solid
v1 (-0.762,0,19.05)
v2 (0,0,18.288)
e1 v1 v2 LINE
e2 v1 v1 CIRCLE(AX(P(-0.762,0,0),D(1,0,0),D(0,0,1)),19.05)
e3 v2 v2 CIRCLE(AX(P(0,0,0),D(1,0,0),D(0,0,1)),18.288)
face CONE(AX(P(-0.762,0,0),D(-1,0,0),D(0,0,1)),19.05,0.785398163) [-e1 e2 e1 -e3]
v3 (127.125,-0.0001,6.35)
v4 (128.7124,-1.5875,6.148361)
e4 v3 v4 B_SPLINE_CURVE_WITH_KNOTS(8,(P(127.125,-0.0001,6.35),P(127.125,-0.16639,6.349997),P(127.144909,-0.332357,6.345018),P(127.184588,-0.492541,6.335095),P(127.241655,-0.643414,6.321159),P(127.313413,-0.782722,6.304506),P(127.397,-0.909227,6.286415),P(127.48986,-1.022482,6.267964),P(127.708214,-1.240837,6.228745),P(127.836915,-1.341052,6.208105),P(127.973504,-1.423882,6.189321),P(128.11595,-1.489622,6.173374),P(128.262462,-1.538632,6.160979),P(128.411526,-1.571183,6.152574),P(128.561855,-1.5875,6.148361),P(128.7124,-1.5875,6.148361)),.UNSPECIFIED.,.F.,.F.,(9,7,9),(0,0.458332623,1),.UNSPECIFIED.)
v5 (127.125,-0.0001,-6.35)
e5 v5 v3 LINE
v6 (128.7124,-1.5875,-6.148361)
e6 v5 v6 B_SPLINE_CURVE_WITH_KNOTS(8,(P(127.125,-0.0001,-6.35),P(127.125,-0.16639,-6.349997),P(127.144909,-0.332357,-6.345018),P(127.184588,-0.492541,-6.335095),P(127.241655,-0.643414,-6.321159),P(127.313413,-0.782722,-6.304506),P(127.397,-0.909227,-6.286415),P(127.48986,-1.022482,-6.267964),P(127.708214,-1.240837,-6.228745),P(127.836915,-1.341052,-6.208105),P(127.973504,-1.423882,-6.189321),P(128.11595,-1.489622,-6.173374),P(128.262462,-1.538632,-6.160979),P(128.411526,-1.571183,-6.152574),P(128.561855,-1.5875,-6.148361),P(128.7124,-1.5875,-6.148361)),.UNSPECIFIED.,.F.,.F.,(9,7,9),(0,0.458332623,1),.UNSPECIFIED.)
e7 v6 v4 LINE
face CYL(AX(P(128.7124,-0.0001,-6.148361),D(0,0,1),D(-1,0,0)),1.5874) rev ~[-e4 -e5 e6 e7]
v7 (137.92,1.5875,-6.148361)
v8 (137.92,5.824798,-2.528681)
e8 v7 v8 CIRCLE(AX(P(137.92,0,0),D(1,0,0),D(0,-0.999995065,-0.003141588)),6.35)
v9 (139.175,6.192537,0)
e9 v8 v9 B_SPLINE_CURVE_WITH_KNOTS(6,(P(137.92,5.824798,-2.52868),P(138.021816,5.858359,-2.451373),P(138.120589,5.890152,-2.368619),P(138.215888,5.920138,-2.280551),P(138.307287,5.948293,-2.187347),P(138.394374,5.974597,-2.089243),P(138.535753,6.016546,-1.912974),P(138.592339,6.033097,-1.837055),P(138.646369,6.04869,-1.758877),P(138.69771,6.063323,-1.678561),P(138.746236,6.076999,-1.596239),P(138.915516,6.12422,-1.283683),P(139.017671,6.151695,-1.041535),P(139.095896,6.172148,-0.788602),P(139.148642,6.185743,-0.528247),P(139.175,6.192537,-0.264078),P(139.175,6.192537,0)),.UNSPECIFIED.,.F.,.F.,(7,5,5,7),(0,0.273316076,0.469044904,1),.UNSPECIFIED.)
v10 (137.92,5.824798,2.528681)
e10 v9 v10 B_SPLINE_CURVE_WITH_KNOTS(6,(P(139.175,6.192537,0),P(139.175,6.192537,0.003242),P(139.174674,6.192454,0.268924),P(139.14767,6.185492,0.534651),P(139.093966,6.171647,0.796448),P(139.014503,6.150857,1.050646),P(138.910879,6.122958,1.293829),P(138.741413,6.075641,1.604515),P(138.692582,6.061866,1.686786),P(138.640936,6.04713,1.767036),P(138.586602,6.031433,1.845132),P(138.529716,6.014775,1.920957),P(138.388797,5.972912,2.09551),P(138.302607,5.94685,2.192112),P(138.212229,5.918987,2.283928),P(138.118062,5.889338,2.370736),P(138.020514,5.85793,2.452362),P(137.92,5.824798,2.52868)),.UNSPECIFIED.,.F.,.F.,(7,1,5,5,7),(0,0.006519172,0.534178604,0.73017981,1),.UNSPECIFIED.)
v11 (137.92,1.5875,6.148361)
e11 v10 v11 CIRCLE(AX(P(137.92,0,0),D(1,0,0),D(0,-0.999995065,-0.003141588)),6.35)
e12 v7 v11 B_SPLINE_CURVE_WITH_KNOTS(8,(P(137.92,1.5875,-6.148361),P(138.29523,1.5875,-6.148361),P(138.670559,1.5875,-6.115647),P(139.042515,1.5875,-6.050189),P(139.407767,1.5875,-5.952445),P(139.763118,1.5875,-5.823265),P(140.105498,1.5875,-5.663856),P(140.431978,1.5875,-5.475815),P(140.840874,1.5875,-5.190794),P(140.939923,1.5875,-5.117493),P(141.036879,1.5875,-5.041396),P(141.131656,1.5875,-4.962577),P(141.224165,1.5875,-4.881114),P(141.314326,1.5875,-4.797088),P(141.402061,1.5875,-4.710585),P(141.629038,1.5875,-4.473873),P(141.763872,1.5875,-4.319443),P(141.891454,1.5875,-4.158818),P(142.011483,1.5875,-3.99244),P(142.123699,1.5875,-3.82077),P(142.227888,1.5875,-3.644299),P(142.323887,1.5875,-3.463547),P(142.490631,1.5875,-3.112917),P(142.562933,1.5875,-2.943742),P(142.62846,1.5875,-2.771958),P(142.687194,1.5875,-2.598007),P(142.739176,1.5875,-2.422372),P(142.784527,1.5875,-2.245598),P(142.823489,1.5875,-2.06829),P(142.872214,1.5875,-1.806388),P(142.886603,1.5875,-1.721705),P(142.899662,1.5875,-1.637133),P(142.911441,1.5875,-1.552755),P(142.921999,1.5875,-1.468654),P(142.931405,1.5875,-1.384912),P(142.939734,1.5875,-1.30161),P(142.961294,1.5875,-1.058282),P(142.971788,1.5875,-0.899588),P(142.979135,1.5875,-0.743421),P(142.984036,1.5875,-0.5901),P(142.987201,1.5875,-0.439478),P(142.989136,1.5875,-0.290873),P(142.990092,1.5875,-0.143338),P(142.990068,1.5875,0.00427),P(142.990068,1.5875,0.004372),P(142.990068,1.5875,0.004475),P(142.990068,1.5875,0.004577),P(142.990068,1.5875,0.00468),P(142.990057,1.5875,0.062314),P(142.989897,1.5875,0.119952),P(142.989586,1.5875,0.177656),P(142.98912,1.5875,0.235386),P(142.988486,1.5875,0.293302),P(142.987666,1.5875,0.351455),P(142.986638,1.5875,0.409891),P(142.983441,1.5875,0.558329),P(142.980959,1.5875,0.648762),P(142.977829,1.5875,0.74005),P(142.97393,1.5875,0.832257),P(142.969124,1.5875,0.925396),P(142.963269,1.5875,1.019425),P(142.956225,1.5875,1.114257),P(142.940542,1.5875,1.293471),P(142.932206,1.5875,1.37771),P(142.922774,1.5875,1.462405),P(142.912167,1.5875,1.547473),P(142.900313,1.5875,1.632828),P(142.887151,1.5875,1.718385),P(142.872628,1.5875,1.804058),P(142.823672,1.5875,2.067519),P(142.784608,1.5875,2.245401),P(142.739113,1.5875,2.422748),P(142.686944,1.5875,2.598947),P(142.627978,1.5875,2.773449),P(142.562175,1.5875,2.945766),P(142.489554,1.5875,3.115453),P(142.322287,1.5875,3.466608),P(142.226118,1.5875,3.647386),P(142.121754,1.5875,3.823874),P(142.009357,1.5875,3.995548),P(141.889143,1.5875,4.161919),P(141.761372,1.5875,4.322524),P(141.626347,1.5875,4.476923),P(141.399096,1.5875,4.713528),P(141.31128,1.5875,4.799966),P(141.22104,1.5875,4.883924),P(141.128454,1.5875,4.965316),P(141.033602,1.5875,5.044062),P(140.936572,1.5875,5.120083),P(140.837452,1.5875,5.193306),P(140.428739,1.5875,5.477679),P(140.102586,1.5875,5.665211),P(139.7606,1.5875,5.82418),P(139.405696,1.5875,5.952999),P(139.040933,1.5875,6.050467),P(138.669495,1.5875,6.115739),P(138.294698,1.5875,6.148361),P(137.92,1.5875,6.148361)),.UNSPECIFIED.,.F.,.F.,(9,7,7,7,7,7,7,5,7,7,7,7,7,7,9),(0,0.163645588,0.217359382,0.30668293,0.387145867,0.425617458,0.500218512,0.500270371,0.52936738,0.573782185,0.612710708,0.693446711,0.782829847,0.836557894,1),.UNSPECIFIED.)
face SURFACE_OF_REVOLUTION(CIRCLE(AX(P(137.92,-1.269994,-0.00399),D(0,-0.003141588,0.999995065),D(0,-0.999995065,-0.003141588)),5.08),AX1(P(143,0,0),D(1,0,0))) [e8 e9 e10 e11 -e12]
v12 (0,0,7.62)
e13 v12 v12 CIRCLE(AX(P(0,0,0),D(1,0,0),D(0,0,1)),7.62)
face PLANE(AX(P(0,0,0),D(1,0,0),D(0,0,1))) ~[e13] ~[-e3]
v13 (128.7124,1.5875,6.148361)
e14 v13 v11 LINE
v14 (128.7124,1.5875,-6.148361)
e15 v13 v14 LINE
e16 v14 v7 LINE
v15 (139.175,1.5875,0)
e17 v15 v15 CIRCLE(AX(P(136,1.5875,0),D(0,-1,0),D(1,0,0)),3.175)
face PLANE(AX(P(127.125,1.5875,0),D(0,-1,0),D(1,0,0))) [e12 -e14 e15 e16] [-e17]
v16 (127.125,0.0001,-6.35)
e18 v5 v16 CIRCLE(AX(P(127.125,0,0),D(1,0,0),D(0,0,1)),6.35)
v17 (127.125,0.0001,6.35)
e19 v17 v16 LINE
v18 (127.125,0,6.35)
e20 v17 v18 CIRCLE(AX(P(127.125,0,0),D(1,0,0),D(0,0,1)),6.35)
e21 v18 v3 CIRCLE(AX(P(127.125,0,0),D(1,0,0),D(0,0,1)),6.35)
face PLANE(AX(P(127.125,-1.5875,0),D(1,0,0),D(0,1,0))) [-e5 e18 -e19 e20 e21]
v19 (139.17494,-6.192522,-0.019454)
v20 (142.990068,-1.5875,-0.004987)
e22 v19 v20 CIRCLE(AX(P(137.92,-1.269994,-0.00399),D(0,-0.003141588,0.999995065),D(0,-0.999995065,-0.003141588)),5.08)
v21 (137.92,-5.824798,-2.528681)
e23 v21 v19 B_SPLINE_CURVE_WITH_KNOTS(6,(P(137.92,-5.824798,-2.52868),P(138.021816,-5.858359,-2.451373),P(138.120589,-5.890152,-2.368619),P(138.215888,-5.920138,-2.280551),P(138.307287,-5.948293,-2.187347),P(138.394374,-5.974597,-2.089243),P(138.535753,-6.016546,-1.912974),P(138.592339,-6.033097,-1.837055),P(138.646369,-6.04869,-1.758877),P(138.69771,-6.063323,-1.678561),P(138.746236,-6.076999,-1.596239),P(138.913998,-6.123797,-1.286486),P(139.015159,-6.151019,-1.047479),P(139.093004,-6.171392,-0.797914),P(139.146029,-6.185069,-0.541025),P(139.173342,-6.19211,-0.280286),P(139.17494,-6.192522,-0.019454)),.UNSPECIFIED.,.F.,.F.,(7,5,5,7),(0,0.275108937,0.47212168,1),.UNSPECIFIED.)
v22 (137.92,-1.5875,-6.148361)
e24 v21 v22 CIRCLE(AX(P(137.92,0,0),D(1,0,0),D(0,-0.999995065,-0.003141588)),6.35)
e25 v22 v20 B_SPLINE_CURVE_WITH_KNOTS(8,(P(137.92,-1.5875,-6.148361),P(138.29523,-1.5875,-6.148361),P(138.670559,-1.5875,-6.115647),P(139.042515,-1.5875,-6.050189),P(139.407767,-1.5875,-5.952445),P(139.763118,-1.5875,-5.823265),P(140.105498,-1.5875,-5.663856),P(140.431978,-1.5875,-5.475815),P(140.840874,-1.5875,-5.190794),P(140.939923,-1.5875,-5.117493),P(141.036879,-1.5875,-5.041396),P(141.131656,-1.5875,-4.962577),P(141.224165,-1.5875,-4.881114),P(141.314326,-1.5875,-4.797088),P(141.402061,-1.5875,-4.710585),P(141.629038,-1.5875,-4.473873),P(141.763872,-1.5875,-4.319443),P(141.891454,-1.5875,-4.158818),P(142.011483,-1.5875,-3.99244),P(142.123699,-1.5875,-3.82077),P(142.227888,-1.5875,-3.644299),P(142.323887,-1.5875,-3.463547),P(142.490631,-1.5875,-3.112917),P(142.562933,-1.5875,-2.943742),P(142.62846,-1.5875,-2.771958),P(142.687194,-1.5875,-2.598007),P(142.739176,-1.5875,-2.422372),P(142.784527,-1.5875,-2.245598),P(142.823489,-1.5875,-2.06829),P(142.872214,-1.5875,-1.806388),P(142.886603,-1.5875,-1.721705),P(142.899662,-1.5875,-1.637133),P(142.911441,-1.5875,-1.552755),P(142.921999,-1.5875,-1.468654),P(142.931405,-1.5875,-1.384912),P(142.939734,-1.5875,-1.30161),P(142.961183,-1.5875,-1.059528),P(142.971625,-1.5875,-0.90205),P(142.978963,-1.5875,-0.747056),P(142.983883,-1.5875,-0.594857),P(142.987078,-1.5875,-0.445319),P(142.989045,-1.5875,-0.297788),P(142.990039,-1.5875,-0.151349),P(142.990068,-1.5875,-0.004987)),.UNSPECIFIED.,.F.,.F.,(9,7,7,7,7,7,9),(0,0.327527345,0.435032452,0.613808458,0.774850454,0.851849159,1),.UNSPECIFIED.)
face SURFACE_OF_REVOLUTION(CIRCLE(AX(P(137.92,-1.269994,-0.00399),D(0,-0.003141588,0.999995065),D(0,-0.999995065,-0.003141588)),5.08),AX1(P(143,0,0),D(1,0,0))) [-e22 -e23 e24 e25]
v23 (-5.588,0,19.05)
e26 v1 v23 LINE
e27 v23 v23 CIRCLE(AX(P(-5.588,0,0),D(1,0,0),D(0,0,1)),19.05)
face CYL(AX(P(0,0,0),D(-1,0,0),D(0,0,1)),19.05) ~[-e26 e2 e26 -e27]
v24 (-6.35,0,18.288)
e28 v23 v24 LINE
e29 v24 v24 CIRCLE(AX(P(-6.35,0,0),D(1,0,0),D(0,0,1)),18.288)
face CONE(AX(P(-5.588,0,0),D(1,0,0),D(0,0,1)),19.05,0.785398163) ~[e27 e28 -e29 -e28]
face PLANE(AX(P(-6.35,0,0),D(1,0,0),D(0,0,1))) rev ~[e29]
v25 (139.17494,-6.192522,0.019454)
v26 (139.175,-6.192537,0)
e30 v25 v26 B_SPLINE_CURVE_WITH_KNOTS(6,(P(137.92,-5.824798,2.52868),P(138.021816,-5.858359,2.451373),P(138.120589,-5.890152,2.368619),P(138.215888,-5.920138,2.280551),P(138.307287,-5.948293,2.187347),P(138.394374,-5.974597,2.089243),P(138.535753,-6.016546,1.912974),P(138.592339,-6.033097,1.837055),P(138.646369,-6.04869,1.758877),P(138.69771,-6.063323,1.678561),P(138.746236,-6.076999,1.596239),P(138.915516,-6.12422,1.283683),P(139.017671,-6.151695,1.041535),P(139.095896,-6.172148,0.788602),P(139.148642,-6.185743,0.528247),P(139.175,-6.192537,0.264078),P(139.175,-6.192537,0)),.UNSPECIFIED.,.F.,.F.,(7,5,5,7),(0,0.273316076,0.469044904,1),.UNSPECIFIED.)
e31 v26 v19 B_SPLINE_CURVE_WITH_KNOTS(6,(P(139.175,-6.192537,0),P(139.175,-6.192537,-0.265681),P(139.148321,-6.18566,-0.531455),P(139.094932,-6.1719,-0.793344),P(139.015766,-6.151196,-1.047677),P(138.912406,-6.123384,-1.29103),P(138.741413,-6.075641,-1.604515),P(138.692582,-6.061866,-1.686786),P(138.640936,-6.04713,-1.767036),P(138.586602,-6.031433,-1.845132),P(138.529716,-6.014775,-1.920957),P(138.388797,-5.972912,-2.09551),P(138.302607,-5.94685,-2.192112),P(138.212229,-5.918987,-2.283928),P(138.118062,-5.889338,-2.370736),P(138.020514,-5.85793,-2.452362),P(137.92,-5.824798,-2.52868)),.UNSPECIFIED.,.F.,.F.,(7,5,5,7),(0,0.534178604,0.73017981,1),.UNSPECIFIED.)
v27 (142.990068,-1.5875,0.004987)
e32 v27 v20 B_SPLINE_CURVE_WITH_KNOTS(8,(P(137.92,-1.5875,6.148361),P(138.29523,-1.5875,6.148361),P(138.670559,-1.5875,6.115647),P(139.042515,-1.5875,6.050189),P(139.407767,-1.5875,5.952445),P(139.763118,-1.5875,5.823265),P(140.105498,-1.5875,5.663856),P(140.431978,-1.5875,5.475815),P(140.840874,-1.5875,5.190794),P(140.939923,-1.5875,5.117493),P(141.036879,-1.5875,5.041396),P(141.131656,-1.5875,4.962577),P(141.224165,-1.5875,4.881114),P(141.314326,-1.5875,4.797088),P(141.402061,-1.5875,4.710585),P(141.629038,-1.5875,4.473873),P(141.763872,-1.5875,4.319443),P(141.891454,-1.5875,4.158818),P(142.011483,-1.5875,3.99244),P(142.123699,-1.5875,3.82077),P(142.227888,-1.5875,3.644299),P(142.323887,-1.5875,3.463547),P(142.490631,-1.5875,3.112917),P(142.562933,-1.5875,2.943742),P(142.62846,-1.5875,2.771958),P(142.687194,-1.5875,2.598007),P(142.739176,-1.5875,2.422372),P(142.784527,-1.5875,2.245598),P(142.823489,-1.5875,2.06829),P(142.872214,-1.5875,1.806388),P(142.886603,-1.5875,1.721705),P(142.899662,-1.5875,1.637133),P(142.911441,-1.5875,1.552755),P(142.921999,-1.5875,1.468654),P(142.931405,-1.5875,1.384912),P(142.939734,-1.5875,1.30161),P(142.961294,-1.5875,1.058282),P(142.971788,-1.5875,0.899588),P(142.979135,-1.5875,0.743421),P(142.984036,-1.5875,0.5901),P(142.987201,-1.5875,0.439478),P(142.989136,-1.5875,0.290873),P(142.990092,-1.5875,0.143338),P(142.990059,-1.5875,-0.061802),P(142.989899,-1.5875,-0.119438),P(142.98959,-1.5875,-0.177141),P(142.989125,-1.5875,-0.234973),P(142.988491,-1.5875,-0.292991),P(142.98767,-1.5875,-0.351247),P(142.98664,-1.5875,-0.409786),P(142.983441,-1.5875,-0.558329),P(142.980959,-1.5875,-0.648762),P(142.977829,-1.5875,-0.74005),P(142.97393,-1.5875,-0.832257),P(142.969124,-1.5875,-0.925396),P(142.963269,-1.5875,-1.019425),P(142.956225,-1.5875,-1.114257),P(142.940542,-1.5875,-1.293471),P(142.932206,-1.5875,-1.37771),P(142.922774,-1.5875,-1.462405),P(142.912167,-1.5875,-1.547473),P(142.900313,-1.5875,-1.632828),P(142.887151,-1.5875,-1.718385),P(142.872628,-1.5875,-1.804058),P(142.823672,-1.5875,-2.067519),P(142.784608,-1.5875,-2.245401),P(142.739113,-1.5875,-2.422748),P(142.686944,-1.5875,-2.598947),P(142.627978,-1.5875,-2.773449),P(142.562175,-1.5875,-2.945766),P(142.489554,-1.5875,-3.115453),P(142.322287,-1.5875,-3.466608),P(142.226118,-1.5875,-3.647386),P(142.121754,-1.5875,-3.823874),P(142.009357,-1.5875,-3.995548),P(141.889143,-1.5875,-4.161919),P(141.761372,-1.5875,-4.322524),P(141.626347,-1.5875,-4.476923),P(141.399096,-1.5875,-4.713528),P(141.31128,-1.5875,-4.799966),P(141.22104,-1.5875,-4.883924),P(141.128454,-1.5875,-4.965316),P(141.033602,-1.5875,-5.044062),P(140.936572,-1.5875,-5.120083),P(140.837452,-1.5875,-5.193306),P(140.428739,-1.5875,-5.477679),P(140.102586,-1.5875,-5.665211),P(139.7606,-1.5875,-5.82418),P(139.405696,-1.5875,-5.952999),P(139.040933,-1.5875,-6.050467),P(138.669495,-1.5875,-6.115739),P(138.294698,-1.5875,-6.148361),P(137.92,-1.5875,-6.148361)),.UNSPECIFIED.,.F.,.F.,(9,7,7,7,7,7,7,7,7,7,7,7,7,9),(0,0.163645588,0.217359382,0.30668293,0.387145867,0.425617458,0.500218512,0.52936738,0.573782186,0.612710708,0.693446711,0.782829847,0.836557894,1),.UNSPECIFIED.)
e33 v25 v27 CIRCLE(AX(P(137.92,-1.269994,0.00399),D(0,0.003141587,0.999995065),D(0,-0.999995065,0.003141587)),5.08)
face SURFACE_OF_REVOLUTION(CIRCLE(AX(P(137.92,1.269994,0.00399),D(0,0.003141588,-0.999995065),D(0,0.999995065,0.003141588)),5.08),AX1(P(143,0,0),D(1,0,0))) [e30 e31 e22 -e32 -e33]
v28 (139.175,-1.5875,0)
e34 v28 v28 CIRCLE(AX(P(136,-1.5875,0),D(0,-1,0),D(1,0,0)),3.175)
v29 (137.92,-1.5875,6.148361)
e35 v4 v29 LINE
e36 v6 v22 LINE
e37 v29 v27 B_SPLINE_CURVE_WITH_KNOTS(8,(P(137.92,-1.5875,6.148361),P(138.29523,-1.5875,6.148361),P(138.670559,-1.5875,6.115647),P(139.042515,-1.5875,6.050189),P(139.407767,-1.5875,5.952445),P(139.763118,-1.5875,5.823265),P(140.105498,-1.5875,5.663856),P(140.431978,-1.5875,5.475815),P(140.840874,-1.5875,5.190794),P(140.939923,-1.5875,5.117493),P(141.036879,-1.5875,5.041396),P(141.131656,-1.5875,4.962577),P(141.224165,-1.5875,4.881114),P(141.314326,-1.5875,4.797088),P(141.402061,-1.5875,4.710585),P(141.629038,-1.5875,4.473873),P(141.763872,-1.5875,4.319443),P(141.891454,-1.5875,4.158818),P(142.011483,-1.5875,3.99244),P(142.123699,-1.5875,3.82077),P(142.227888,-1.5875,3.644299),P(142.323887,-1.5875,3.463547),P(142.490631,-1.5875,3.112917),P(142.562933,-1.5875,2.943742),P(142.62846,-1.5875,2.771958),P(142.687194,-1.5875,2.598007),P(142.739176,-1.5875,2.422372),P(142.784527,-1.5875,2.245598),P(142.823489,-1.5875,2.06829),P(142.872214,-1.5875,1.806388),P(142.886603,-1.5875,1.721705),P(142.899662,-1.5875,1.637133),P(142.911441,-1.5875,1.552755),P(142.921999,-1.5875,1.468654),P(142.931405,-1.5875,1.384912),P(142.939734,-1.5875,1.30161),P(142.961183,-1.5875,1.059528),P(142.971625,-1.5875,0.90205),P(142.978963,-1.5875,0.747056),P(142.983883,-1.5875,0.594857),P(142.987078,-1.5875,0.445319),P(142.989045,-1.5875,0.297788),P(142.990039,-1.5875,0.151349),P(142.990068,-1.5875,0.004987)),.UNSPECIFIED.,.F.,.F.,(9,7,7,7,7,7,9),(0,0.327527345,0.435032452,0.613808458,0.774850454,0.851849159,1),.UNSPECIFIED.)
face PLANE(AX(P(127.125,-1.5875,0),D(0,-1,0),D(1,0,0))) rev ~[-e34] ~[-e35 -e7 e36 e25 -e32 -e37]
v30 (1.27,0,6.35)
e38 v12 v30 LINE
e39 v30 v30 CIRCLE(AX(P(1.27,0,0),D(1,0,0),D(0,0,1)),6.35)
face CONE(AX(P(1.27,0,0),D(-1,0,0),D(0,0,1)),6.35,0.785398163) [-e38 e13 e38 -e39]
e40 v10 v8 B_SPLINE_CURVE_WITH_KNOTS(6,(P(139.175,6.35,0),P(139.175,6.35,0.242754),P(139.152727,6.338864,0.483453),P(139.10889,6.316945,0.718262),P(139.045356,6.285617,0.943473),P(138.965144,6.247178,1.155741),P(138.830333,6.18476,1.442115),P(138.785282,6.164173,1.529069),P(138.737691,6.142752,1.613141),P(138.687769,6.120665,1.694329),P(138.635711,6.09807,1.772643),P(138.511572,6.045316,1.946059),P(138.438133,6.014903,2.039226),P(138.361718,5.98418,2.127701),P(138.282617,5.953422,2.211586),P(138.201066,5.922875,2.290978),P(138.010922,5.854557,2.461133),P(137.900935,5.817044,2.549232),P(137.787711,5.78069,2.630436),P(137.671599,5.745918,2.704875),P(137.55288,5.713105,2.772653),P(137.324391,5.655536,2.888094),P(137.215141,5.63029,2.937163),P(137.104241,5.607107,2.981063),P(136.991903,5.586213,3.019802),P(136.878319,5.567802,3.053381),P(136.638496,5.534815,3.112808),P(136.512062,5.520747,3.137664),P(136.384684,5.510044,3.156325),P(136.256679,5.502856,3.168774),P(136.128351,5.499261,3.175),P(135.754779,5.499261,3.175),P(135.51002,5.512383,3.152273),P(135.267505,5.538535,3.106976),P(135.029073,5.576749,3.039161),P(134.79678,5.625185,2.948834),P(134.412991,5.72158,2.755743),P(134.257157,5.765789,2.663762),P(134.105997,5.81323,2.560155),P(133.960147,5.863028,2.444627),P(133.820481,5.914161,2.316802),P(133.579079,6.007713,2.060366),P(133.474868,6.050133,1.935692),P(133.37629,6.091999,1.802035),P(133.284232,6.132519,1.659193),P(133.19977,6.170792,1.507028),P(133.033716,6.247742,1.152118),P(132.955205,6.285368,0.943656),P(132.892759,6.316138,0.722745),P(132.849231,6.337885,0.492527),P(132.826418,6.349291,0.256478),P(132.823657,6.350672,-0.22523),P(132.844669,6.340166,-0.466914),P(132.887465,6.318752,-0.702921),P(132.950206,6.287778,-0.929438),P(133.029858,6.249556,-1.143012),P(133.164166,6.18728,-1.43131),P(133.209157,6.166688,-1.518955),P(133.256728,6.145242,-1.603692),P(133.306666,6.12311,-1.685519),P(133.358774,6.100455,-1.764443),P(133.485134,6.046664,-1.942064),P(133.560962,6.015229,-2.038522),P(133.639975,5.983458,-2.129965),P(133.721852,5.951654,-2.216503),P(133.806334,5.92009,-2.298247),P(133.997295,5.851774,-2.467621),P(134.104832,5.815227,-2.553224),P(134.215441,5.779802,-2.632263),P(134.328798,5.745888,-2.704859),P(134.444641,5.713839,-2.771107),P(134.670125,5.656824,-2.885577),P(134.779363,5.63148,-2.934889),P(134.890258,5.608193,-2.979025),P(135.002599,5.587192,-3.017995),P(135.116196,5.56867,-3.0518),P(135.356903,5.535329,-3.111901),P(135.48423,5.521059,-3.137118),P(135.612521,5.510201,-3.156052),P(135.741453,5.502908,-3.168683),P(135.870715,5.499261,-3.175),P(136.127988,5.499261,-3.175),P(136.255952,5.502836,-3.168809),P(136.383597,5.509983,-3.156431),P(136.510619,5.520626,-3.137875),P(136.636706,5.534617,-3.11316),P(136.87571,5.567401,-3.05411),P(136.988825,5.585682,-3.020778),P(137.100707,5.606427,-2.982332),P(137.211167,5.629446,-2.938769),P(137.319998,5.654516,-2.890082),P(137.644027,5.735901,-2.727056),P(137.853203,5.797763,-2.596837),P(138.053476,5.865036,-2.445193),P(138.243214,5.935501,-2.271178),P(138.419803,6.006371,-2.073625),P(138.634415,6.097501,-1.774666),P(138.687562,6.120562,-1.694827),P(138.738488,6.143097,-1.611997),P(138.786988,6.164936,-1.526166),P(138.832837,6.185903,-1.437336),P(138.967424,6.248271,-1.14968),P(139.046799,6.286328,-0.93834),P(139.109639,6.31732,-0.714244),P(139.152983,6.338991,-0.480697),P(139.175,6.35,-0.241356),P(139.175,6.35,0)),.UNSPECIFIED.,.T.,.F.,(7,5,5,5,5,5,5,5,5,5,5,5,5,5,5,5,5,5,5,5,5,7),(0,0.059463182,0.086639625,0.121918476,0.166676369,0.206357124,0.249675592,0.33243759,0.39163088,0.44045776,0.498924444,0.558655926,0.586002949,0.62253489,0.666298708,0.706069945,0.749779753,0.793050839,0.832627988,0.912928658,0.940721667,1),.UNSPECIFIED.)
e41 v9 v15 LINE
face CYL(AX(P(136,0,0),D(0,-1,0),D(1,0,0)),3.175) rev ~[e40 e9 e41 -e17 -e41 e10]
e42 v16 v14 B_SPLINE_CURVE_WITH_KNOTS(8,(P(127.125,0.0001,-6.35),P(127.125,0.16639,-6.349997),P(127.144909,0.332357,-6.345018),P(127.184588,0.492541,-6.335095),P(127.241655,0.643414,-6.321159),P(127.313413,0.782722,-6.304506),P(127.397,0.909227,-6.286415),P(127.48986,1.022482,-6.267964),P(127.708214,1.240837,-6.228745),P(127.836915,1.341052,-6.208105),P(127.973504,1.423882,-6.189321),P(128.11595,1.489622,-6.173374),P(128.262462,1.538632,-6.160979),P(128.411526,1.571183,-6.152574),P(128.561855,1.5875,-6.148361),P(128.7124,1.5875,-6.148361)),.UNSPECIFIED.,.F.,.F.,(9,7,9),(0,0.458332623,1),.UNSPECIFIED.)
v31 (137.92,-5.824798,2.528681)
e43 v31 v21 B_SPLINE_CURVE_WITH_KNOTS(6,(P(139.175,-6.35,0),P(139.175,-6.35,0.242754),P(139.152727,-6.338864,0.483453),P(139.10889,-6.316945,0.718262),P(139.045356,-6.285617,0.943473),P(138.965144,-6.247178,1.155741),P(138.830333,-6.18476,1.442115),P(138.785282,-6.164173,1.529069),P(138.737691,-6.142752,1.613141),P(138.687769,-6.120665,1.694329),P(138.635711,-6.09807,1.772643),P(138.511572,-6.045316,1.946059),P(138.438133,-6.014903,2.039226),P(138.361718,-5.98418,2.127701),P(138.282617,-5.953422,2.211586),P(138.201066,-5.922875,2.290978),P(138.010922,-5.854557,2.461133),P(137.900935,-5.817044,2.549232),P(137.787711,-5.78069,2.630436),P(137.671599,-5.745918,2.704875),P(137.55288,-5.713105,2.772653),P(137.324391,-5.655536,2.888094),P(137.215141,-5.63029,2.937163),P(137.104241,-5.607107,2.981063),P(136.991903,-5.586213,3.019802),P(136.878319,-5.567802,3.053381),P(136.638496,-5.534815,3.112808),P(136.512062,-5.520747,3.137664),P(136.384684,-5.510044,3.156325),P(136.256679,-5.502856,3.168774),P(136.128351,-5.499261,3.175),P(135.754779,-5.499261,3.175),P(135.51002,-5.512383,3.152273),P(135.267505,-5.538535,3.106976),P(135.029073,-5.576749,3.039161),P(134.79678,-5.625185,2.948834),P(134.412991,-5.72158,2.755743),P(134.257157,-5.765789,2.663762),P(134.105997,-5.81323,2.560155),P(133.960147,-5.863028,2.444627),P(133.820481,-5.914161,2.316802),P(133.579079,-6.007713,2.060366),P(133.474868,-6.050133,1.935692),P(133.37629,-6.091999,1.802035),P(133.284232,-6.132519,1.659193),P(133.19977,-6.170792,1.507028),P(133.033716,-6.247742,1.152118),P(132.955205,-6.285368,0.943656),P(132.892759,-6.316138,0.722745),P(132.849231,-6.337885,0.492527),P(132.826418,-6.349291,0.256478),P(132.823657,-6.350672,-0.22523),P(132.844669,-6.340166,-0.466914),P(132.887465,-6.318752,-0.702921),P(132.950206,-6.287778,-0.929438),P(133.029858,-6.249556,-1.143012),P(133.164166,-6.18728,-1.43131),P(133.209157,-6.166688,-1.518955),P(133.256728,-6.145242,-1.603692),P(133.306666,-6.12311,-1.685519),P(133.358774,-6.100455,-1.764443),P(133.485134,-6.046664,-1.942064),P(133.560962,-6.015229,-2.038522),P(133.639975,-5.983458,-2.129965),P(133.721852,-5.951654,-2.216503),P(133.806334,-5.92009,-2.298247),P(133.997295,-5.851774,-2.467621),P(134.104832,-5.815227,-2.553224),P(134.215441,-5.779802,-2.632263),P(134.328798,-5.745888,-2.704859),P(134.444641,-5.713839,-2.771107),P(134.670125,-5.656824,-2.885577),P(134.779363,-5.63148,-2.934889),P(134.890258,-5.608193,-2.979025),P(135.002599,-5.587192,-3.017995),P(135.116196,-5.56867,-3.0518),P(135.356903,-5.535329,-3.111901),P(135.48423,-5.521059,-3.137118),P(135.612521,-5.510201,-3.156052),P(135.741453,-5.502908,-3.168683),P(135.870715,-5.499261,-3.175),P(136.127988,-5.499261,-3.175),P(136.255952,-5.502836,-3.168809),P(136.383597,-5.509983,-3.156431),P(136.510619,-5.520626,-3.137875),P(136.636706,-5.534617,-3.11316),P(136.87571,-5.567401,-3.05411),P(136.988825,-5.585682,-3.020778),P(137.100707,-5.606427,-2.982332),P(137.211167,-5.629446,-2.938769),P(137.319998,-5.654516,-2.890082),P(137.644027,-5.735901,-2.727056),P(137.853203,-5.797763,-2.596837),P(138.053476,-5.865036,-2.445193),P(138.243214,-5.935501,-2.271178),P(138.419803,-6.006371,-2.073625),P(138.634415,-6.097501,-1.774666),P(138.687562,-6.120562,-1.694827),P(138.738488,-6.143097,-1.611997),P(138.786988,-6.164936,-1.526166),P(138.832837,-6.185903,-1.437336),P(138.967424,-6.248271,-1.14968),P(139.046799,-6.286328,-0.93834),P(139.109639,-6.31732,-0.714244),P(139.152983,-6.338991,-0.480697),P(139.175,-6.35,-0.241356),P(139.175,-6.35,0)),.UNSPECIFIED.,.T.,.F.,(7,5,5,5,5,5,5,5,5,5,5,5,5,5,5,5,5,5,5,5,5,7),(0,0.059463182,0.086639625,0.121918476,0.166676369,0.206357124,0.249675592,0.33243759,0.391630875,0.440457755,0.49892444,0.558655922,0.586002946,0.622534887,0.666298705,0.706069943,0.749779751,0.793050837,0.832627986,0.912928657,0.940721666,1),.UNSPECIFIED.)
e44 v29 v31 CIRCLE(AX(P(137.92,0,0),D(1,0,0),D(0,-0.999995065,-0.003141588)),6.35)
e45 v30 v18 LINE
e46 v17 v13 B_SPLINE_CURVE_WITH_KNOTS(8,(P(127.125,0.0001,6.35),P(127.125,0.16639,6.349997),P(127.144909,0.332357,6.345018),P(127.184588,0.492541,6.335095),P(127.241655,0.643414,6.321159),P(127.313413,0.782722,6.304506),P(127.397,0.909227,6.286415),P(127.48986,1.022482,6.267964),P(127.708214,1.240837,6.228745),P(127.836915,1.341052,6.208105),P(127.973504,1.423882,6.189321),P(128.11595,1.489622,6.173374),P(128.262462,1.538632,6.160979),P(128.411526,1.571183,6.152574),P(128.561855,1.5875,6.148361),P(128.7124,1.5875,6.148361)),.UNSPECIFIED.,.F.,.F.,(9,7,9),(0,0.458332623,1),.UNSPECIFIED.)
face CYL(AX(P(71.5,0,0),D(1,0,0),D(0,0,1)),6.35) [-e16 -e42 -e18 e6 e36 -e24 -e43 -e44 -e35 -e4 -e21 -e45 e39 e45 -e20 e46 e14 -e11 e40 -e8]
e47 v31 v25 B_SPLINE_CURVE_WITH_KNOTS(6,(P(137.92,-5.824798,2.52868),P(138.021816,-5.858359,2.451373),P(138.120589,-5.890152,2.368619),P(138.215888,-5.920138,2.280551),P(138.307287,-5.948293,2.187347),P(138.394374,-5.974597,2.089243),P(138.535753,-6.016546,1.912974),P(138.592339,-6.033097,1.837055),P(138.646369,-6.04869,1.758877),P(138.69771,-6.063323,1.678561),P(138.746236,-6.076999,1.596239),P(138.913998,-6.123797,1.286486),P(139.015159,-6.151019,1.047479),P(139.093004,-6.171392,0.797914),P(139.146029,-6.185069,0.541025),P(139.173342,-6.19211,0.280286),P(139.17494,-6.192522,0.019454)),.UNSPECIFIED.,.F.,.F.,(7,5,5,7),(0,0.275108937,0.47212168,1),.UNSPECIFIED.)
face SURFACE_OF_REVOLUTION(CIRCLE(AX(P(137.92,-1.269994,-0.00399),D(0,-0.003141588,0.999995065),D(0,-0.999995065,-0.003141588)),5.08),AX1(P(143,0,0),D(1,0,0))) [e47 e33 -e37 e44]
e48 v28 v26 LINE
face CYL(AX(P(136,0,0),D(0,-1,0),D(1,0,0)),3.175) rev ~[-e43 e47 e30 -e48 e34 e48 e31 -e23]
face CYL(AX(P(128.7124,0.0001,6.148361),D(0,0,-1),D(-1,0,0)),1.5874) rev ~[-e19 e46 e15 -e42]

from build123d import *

# Parameters (mm, degrees)
F0_W        = 143
F0_H        = 6.35
F2_SIZE     = 0.762
F3_SIZE     = 1.27
F4_R        = 3.175
F5_DEPTH    = 12.7
F6_W        = 15.875
F6_H        = 3.175
F7_DEPTH    = 12.7
F8_R        = 1.5874
F9_T2_ANGLE = 359.64
F9_T4_ANGLE = 359.64


# Not quite as in the source:
# - a fillet or chamfer that OpenCascade refuses, or shapes differently, is made with other operations: its cross-section is extruded or revolved along the edge and cut away or added
# - a fillet or chamfer is up to 0.001 mm smaller than in the source, because OpenCascade refuses the exact size


with BuildPart() as f1:
    # F0 (on Front) → F1 (revolve)
    with BuildSketch(Plane.XZ):
        Polygon((0, 19.05), (-6.35, 19.05), (-6.35, 0), (0, 0), (0, 6.35), align=None)
        with Locations((71.5, 3.175)):
            Rectangle(F0_W, F0_H)
    revolve(axis=Axis((71.5, 0, 0), (1, 0, 0)))

    # F2
    f2_edges = [f1.edges().sort_by_distance(p)[0] for p in [
        (0, 0, -19.05),
        (-6.35, 0, -19.05),
    ]]
    chamfer(f2_edges, length=F2_SIZE)

    # F3
    f3_edges = [f1.edges().sort_by_distance(p)[0] for p in [
        (0, 0, -6.35),
    ]]
    chamfer(f3_edges, length=F3_SIZE)

    # F4 (on Front) → F5 (cut, symmetric)
    with BuildSketch(Plane.XZ):
        with Locations((136, 0)):
            Circle(F4_R)
    extrude(amount=F5_DEPTH, both=True, mode=Mode.SUBTRACT)

    # F6 (on Top) → F7 (cut, symmetric)
    with BuildSketch(Plane.XY):
        with Locations((135.0625, 0)):
            Rectangle(F6_W, F6_H)
    extrude(amount=F7_DEPTH, both=True, mode=Mode.SUBTRACT)

    # F8 (radius 1.5875 in the source; OpenCascade refuses exactly that, so slightly less here)
    f8_edges = [f1.edges().sort_by_distance(p)[0] for p in [
        (127.125, 1.5875, 0),
        (127.125, -1.5875, 0),
    ]]
    fillet(f8_edges, radius=F8_R)

    # F9: fillet of radius 5.08 on 2 edges, made by hand

    # F9_s1 → F9_t2 (revolve, cut)
    with BuildSketch(Plane(origin=(0, 0, 0), x_dir=(1, 0, 0), z_dir=(0, -0.0031415875, 0.9999950652))):
        with BuildLine():
            ThreePointArc((137.92, -6.35), (141.5121024484, -4.8621024484), (143, -1.27))
            Line((143, -1.27), (143, -6.35))
            Line((143, -6.35), (137.92, -6.35))
        make_face()
    revolve(axis=Axis((143, 0, 0), (1, 0, 0)), revolution_arc=F9_T2_ANGLE, mode=Mode.SUBTRACT)

    # F9_s3 → F9_t4 (revolve, cut)
    with BuildSketch(Plane(origin=(0, 0, 0), x_dir=(1, 0, 0), z_dir=(0, 0.0031415875, -0.9999950652))):
        with BuildLine():
            ThreePointArc((137.92, -6.35), (141.5121024484, -4.8621024484), (143, -1.27))
            Line((143, -1.27), (143, -6.35))
            Line((143, -6.35), (137.92, -6.35))
        make_face()
    revolve(axis=Axis((143, 0, 0), (1, 0, 0)), revolution_arc=F9_T4_ANGLE, mode=Mode.SUBTRACT)


solid = f1.part
